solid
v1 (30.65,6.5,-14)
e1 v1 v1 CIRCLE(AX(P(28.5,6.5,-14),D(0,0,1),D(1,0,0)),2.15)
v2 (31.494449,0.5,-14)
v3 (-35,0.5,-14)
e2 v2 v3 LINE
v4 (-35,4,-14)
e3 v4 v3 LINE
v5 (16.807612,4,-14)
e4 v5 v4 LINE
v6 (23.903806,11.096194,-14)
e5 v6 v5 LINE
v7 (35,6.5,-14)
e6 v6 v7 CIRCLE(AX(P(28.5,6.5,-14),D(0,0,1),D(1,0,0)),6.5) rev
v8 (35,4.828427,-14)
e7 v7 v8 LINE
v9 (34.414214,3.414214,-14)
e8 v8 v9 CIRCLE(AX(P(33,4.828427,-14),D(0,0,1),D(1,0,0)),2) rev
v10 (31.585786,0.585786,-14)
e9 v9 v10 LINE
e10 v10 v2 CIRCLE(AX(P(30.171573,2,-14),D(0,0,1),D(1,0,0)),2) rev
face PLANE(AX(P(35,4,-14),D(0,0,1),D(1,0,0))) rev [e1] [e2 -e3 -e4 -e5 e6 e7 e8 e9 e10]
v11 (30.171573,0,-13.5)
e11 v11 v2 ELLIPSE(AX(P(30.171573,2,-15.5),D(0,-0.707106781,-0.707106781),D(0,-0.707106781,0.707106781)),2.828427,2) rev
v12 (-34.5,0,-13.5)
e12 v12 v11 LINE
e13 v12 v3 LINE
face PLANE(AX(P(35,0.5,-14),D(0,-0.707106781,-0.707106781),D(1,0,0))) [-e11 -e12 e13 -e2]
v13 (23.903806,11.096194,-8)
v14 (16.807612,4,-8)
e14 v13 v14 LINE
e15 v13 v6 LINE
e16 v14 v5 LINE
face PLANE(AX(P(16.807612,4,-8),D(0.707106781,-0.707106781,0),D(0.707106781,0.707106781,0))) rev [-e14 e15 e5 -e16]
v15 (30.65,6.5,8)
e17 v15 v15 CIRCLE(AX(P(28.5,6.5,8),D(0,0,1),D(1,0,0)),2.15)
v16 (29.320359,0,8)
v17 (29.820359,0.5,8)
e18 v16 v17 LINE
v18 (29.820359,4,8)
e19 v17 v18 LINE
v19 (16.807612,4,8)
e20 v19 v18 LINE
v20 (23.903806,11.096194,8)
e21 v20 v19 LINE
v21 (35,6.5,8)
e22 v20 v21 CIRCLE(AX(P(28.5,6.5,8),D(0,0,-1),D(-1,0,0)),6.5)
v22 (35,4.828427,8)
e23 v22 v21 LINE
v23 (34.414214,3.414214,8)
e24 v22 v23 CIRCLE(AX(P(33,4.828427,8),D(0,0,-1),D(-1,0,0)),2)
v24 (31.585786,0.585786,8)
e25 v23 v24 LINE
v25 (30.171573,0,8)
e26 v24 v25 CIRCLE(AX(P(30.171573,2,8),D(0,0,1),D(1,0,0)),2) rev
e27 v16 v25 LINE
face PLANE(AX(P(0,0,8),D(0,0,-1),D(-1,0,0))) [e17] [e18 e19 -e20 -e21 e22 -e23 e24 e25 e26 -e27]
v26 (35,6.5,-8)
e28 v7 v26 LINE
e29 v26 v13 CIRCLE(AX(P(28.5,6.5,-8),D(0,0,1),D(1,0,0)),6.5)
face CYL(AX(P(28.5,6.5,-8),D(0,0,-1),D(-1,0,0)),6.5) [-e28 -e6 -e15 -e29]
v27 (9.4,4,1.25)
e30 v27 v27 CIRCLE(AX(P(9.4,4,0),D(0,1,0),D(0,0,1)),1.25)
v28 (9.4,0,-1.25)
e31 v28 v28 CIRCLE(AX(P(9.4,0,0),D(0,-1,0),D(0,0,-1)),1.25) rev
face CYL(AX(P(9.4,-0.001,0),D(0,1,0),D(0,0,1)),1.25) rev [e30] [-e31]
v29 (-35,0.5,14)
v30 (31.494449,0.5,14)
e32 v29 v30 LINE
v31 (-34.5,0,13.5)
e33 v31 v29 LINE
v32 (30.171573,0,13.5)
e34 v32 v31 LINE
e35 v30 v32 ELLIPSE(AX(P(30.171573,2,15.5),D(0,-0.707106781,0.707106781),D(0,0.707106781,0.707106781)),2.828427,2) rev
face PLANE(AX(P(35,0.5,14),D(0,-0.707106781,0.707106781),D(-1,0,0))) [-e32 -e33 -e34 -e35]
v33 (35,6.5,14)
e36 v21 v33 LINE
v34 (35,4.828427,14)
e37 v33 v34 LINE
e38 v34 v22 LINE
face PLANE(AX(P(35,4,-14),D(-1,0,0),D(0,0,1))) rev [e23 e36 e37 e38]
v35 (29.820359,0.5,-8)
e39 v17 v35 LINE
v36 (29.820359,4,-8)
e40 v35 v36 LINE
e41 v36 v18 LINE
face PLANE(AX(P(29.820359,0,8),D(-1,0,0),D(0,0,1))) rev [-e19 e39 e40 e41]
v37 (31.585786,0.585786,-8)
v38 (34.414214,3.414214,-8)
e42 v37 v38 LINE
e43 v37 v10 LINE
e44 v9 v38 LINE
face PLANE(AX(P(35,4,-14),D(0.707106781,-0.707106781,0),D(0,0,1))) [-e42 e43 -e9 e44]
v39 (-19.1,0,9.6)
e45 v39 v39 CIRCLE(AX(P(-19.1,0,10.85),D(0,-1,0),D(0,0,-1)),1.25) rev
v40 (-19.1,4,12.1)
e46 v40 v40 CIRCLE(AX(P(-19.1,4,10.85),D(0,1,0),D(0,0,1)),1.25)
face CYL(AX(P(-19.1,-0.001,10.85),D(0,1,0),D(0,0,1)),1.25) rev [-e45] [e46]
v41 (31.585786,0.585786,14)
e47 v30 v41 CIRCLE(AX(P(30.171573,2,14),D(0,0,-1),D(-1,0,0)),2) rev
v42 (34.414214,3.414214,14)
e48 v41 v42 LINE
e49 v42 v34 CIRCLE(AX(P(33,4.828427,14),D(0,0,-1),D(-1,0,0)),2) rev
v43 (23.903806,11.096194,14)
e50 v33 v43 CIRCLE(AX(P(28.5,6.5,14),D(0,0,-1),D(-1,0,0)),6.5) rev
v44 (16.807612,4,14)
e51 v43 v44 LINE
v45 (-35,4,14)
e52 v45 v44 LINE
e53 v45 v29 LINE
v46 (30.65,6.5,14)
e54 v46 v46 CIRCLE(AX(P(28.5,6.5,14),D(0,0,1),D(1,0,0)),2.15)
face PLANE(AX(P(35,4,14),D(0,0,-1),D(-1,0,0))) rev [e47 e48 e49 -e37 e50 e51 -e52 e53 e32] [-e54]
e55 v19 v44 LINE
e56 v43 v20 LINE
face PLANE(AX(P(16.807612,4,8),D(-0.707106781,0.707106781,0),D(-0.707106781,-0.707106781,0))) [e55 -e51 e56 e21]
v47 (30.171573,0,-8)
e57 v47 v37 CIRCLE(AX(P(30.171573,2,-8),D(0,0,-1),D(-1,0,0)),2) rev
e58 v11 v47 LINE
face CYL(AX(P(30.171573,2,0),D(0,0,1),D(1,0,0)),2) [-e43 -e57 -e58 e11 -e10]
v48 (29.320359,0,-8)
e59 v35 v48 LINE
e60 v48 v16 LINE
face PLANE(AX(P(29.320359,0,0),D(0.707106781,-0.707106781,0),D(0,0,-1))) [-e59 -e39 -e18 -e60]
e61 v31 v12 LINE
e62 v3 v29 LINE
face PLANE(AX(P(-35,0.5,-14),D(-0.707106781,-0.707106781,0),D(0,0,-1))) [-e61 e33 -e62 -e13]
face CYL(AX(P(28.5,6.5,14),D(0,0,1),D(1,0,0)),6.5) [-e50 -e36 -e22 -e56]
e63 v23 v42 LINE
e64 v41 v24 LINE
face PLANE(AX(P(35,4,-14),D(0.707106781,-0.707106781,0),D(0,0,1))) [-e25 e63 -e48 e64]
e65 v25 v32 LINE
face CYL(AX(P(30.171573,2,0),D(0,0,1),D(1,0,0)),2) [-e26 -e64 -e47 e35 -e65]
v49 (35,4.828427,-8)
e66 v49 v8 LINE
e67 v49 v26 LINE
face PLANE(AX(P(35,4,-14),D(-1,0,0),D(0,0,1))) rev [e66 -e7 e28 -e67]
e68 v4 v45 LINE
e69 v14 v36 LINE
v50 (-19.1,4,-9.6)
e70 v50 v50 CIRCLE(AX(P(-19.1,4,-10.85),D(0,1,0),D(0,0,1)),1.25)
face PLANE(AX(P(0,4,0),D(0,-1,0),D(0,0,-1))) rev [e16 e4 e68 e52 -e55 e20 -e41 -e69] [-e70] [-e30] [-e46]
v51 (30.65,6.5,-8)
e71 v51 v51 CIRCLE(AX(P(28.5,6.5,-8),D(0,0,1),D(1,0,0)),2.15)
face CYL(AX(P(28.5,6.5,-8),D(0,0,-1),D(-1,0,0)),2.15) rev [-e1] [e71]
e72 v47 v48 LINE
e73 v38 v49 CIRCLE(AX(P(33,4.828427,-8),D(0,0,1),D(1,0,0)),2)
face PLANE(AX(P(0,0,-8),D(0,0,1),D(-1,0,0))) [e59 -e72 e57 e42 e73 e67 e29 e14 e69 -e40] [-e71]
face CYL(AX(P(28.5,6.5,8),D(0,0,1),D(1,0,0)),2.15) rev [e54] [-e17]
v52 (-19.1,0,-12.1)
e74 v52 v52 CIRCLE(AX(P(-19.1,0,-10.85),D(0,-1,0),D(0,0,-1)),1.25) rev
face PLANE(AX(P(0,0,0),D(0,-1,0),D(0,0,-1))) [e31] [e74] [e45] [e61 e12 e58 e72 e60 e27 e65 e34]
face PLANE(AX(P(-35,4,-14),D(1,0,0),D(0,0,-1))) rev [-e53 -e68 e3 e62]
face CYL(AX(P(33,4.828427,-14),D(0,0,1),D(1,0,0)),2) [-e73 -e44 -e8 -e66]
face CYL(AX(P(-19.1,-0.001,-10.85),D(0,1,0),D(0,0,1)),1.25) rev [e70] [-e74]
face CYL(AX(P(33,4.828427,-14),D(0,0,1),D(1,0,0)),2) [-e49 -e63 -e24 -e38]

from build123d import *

# Parameters (mm, degrees)
SKIZZE1_W                           = 70
SKIZZE1_H                           = 28
AUFSATZ_LINEAR_AUSTRAGEN1_DEPTH     = 4
SKIZZE2_R                           = 2.15
AUFSATZ_LINEAR_AUSTRAGEN2_DEPTH     = 6
VERRUNDUNG1_R                       = 6.5
VERRUNDUNG1_OF_SPIEGELN1_R          = 6.5
FASE1_SIZE                          = 4
VERRUNDUNG2_R                       = 2
SCHNITT_LINEAR_START                = -5
SCHNITT_LINEAR_AUSTRAGEN1_OUTLINE_W = 6.179640558
SCHNITT_LINEAR_AUSTRAGEN1_OUTLINE_H = 16
SCHNITT_LINEAR_AUSTRAGEN1_DEPTH     = 5.828427125
SCHNITT_LINEAR_AUSTRAGEN2_REACH     = 40.756
SKIZZE4_R                           = 1.25
FASE2_SIZE                          = 0.5


with BuildPart() as part:
    # Skizze1 → Aufsatz-Linear austragen1 (new body)
    with BuildSketch(Plane(origin=(0, 0, 0), x_dir=(1, 0, 0), z_dir=(0, 1, 0))):
        Rectangle(SKIZZE1_W, SKIZZE1_H)
    extrude(amount=AUFSATZ_LINEAR_AUSTRAGEN1_DEPTH)

    # Skizze2 → Aufsatz-Linear austragen2 (add)
    with BuildSketch(Plane.XY.offset(14)):
        Polygon((16.807611845, 4), (25.807611845, 13), (35, 13), (35, 4), align=None)
        with Locations((28.5, 6.5)):
            Circle(SKIZZE2_R, mode=Mode.SUBTRACT)
    aufsatz_linear_austragen2 = extrude(amount=-AUFSATZ_LINEAR_AUSTRAGEN2_DEPTH)

    # Verrundung1
    verrundung1_edges = [part.edges().sort_by_distance(p)[0] for p in [
        (25.807611845, 13, 11),
        (35, 13, 11),
    ]]
    fillet(verrundung1_edges, radius=VERRUNDUNG1_R - 0.0001)  # a hair under: the kernel refuses the full size

    # Spiegeln1: Aufsatz-Linear austragen2 across plane
    add(aufsatz_linear_austragen2.mirror(Plane.XY))

    # Verrundung1 of Spiegeln1
    verrundung1_of_spiegeln1_edges = [part.edges().sort_by_distance(p)[0] for p in [
        (25.807611845, 13, -11),
        (35, 13, -11),
    ]]
    fillet(verrundung1_of_spiegeln1_edges, radius=VERRUNDUNG1_OF_SPIEGELN1_R - 0.0001)  # a hair under: the kernel refuses the full size

    # Fase1
    fase1_edges = [part.edges().sort_by_distance(p)[0] for p in [
        (35, 0, 0),
    ]]
    chamfer(fase1_edges, length=FASE1_SIZE - 0.0001)  # a hair under: the kernel refuses the full size

    # Verrundung2
    # the kernel refuses this fillet: 2 mm, written as the material it takes off along each edge
    with BuildSketch(Plane(origin=(31.0001, 0, 16.071067812), x_dir=(0.7071067811865477, 0.7071067811865474, 0), z_dir=(0, 0, -1)), Plane(origin=(35, 3.9999, 16.071067812), x_dir=(0, 1, 0), z_dir=(0, 0, -1))) as verrundung2_piece_1:
        with BuildLine():
            CenterArc((VERRUNDUNG2_R * 0.414213562373, -VERRUNDUNG2_R), VERRUNDUNG2_R, 90, 45)
            Line((-VERRUNDUNG2_R * 0.292893218813, -VERRUNDUNG2_R * 0.292893218813), (0, 0))
            Line((0, 0), (VERRUNDUNG2_R * 0.414213562373, 0))
        make_face()
    extrude(amount=32.142135624, mode=Mode.SUBTRACT)

    # Schnitt-Linear austragen1: read off the stored shape, not the designer's step
    # Schnitt-Linear austragen1 outline → Schnitt-Linear austragen1 (cut)
    with BuildSketch(Plane(origin=(0, 4, 0), x_dir=(1, 0, 0), z_dir=(0, 1, 0)).offset(SCHNITT_LINEAR_START)):
        with Locations((32.910179721, 0)):
            Rectangle(SCHNITT_LINEAR_AUSTRAGEN1_OUTLINE_W, SCHNITT_LINEAR_AUSTRAGEN1_OUTLINE_H)
    extrude(amount=SCHNITT_LINEAR_AUSTRAGEN1_DEPTH, mode=Mode.SUBTRACT)

    # Skizze4 → Schnitt-Linear austragen2 (cut, up to next)
    with BuildSketch(Plane(origin=(0, 4, 0), x_dir=(1, 0, 0), z_dir=(0, 1, 0)), mode=Mode.PRIVATE) as schnitt_linear_austragen2_sk1:
        with Locations(Location((-19.1, -10.85, 0), (0, 0, 270))):
            Circle(SKIZZE4_R)
    schnitt_linear_austragen2_tool1 = extrude(schnitt_linear_austragen2_sk1.sketch, amount=-SCHNITT_LINEAR_AUSTRAGEN2_REACH, mode=Mode.PRIVATE) & part.part
    # Skizze4 → Schnitt-Linear austragen2 (cut, up to next)
    with BuildSketch(Plane(origin=(0, 4, 0), x_dir=(1, 0, 0), z_dir=(0, 1, 0)), mode=Mode.PRIVATE) as schnitt_linear_austragen2_sk2:
        with Locations(Location((9.4, 0, 0), (0, 0, 270))):
            Circle(SKIZZE4_R)
    schnitt_linear_austragen2_tool2 = extrude(schnitt_linear_austragen2_sk2.sketch, amount=-SCHNITT_LINEAR_AUSTRAGEN2_REACH, mode=Mode.PRIVATE) & part.part
    # Skizze4 → Schnitt-Linear austragen2 (cut, up to next)
    with BuildSketch(Plane(origin=(0, 4, 0), x_dir=(1, 0, 0), z_dir=(0, 1, 0)), mode=Mode.PRIVATE) as schnitt_linear_austragen2_sk3:
        with Locations(Location((-19.1, 10.85, 0), (0, 0, 270))):
            Circle(SKIZZE4_R)
    schnitt_linear_austragen2_tool3 = extrude(schnitt_linear_austragen2_sk3.sketch, amount=-SCHNITT_LINEAR_AUSTRAGEN2_REACH, mode=Mode.PRIVATE) & part.part
    add(schnitt_linear_austragen2_tool1.solids().sort_by_distance((-19.1, 4, 10.85))[0], mode=Mode.SUBTRACT)
    add(schnitt_linear_austragen2_tool2.solids().sort_by_distance((9.4, 4, 0))[0], mode=Mode.SUBTRACT)
    add(schnitt_linear_austragen2_tool3.solids().sort_by_distance((-19.1, 4, -10.85))[0], mode=Mode.SUBTRACT)

    # Fase2
    # the kernel refuses this chamfer: 0.5 mm, written as the material it takes off along each edge
    with BuildSketch(Plane(origin=(-36.285841494, 0, 14), x_dir=(0, 0, -1), z_dir=(1, 0, 0))) as fase2_piece_1:
        Polygon((FASE2_SIZE, 0), (0, FASE2_SIZE), (0, 0), align=None)
    extrude(amount=68.643444909, mode=Mode.SUBTRACT)
    with BuildSketch(Plane(origin=(-35, 0, -15.285841494), x_dir=(1, 0, 0), z_dir=(0, 0, 1))) as fase2_piece_2:
        Polygon((FASE2_SIZE, 0), (0, FASE2_SIZE), (0, 0), align=None)
    extrude(amount=30.571682988, mode=Mode.SUBTRACT)
    with BuildSketch(Plane(origin=(32.357603415, 0, -14), x_dir=(0, 1, 0), z_dir=(-1, 0, 0))) as fase2_piece_3:
        Polygon((FASE2_SIZE, 0), (0, -FASE2_SIZE), (0, 0), align=None)
    extrude(amount=68.643444909, mode=Mode.SUBTRACT)
    with BuildSketch(Plane(origin=(29.820359442, 0, 8), x_dir=(-1, 0, 0), z_dir=(0, 0, -1))) as fase2_piece_4:
        Polygon((FASE2_SIZE, 0), (0, FASE2_SIZE), (0, 0), align=None)
    extrude(amount=16, mode=Mode.SUBTRACT)


solid = part.part
